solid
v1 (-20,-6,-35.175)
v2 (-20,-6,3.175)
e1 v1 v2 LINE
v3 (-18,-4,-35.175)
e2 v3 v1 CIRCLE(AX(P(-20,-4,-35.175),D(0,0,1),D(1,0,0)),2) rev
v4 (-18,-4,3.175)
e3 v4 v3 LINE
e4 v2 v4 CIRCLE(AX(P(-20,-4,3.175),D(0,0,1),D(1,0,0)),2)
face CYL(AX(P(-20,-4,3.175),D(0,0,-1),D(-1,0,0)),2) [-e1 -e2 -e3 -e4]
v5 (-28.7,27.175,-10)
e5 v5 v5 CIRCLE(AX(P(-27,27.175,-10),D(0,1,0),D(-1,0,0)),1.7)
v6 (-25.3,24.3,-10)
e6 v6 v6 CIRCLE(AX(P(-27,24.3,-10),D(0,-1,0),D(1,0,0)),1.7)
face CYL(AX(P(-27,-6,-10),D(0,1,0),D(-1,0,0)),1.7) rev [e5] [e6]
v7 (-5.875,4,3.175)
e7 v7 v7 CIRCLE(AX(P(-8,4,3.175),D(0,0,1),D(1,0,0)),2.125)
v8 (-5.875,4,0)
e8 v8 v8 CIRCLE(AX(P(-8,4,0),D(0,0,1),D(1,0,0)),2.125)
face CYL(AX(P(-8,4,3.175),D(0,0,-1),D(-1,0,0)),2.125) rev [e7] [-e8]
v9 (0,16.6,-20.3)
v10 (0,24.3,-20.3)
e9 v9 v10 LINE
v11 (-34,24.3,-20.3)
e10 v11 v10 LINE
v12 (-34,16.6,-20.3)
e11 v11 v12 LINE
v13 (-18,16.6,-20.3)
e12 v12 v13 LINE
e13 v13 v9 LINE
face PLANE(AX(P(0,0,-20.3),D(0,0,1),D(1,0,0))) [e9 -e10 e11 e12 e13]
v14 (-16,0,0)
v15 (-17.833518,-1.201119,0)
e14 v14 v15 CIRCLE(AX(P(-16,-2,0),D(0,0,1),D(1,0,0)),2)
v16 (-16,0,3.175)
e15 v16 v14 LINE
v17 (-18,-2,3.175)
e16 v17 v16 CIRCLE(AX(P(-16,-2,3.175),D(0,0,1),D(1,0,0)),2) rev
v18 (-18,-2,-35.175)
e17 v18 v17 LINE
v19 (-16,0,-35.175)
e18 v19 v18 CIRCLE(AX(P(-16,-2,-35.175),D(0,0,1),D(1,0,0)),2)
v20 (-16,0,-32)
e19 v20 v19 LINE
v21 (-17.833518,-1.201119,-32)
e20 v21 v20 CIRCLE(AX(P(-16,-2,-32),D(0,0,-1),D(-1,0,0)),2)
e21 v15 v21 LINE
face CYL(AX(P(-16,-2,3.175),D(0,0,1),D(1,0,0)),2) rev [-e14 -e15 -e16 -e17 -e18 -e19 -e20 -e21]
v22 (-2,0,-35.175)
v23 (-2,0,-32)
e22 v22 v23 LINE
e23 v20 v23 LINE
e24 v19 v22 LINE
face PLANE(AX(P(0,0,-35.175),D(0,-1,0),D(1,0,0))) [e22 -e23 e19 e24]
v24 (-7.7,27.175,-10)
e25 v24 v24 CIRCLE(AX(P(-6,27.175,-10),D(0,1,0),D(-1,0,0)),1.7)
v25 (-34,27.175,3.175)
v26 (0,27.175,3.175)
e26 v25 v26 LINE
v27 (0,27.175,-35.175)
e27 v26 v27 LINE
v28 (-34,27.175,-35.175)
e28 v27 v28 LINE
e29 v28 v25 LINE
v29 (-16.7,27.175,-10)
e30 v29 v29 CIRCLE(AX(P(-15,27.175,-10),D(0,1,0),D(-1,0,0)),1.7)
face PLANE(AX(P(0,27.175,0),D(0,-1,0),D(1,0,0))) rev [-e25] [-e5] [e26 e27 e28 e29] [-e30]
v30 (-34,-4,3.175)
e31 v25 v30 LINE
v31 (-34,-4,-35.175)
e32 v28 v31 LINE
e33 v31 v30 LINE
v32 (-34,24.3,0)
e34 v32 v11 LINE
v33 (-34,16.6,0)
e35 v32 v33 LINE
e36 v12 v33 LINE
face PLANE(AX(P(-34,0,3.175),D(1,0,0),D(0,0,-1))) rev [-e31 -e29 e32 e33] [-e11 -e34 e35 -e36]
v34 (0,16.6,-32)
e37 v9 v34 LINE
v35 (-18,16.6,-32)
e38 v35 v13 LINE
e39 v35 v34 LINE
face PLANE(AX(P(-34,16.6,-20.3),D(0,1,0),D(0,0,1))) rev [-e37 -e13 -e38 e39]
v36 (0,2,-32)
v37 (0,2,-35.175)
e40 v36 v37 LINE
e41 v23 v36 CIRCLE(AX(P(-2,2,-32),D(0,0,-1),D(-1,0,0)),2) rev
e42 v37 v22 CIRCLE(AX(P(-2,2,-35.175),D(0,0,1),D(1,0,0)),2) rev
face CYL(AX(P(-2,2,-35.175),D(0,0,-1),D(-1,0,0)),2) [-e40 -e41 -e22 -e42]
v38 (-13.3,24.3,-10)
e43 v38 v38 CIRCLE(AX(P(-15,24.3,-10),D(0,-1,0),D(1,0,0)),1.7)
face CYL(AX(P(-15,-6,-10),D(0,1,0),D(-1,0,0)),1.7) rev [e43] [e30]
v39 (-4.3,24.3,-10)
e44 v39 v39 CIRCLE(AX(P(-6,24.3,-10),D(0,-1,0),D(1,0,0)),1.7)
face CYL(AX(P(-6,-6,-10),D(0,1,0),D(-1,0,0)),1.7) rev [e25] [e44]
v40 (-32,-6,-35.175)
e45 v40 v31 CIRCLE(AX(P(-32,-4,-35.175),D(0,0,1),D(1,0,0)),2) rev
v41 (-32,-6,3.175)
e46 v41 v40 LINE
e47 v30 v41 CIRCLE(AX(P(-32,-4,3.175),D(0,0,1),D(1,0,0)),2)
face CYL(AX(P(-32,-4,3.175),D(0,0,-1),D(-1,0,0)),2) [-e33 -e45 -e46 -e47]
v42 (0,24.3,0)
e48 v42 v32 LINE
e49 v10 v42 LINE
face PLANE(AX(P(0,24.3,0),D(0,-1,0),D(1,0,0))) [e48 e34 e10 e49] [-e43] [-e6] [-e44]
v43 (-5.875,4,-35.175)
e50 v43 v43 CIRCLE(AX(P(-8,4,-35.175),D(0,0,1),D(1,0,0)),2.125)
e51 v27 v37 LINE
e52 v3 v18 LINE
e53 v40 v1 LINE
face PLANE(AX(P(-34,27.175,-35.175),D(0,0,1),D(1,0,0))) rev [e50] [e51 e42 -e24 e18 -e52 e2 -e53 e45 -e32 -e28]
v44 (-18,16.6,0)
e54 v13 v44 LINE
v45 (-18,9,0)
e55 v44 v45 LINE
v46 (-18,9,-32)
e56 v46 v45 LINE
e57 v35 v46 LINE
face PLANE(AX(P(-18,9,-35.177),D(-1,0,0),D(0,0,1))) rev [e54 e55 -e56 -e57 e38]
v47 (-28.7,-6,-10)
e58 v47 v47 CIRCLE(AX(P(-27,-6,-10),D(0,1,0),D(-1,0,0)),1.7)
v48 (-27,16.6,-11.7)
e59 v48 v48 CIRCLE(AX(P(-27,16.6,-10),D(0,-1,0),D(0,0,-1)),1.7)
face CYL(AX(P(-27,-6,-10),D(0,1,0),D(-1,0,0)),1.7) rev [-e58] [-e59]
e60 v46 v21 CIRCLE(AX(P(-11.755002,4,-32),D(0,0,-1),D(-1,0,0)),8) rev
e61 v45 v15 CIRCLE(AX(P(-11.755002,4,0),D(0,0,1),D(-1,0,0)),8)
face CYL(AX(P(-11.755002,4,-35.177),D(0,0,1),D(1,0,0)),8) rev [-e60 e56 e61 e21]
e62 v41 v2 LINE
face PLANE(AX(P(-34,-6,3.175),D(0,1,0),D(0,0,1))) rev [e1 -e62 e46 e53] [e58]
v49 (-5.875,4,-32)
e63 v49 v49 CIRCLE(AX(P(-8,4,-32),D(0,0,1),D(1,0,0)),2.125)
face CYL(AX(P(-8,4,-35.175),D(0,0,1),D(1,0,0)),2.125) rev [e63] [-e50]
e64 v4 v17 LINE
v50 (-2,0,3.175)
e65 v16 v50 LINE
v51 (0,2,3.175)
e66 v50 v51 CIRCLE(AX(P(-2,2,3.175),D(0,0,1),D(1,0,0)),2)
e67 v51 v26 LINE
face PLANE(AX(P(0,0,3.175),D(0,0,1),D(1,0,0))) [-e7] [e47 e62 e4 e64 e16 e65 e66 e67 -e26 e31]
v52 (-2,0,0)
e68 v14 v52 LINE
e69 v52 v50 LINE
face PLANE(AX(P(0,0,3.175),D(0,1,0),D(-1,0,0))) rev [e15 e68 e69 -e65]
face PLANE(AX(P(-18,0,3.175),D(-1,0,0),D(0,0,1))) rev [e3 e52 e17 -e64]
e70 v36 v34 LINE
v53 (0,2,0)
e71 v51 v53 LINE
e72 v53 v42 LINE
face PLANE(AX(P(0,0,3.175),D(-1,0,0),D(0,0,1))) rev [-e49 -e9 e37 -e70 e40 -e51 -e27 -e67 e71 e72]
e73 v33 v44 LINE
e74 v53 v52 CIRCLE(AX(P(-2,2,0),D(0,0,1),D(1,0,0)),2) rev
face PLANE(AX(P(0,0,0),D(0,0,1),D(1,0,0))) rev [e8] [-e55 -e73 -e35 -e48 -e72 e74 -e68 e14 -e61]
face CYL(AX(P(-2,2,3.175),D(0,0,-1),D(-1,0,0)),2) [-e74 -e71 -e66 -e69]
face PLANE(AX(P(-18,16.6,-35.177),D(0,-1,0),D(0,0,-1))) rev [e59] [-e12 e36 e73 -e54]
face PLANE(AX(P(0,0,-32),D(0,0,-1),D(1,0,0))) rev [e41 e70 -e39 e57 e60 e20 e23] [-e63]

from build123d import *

# Parameters (mm, degrees)
SKETCH1_R           = 2.125
BOSS_EXTRUDE1_DEPTH = 3.175
SKETCH4_W           = 34
SKETCH4_H           = 38.35
BOSS_EXTRUDE2_DEPTH = 3.175
BOSS_EXTRUDE3_REACH = 57.962
SKETCH6_W           = 34
SKETCH6_H           = 7.4
BOSS_EXTRUDE4_DEPTH = 11.7
FILLET1_START       = -36
FILLET1_DEPTH       = 40
FILLET1_START_2     = -35.175
FILLET1_2_DEPTH     = 3.175
FILLET1_3_DEPTH     = 3.175
FILLET1_START_3     = -32.3353435
FILLET1_4_DEPTH     = 32.635
SKETCH7_W           = 34
SKETCH7_H           = 20.3
CUT_EXTRUDE1_DEPTH  = 0.3
SKETCH8_R           = 1.7
CUT_EXTRUDE2_DEPTH  = 60.108893155


with BuildPart() as part:
    # Sketch1 → Boss-Extrude1 (new body)
    with BuildSketch(Plane.XY):
        Polygon((0, 0), (-18, 0), (-18, -6), (-34, -6), (-34, 0), (-34, 24), (0, 24), align=None)
        with Locations((-8, 4)):
            Circle(SKETCH1_R, mode=Mode.SUBTRACT)
    boss_extrude1 = extrude(amount=BOSS_EXTRUDE1_DEPTH)

    # Sketch4 → Boss-Extrude2 (add)
    with BuildSketch(Plane(origin=(0, 24, 0), x_dir=(1, 0, 0), z_dir=(0, 1, 0))):
        with Locations((-17, 16)):
            Rectangle(SKETCH4_W, SKETCH4_H)
    extrude(amount=BOSS_EXTRUDE2_DEPTH)

    # Mirror2: Boss-Extrude1 across plane
    add(boss_extrude1.mirror(Plane(origin=(0, 0, -16), x_dir=(1, 0, 0), z_dir=(0, 0, -1))))

    # Sketch5 → Boss-Extrude3 (add, up to next)
    with BuildSketch(Plane(origin=(0, 0, 0), x_dir=(-1, 0, 0), z_dir=(0, 0, -1)), mode=Mode.PRIVATE) as boss_extrude3_sk1:
        with BuildLine():
            Line((18, 9), (18, 16.6))
            Line((18, 16.6), (34, 16.6))
            Line((34, 16.6), (34, -6))
            Line((34, -6), (18, -6))
            Line((18, -6), (18, -1))
            ThreePointArc((18, -1), (19.755002002, 4), (18, 9))
        make_face()
    boss_extrude3_tool1 = extrude(boss_extrude3_sk1.sketch, amount=BOSS_EXTRUDE3_REACH, mode=Mode.PRIVATE) - part.part
    add(boss_extrude3_tool1.solids().sort_by_distance((-26.249904, 5.344559, 0))[0])

    # Sketch6 → Boss-Extrude4 (add)
    with BuildSketch(Plane.XY.offset(-32)):
        with Locations((-17, 20.3)):
            Rectangle(SKETCH6_W, SKETCH6_H)
    extrude(amount=BOSS_EXTRUDE4_DEPTH)

    # Fillet1: read off the stored shape, not the designer's step
    # Fillet1 outline → Fillet1 (cut)
    with BuildSketch(Plane.XY.offset(FILLET1_START)):
        with BuildLine():
            Line((-34, -6), (-32, -6))
            ThreePointArc((-32, -6), (-33.414213562, -5.414213562), (-34, -4))
            Line((-34, -4), (-34, -6))
        make_face()
        with BuildLine():
            Line((-18, -6), (-18, -4))
            ThreePointArc((-18, -4), (-18.585786438, -5.414213562), (-20, -6))
            Line((-20, -6), (-18, -6))
        make_face()
        with BuildLine():
            ThreePointArc((0, 2), (-0.585786438, 0.585786438), (-2, 0))
            Line((-2, 0), (0, 0))
            Line((0, 0), (0, 2))
        make_face()
    extrude(amount=FILLET1_DEPTH, mode=Mode.SUBTRACT)

    # Fillet1 2 outline → Fillet1 2 (add)
    with BuildSketch(Plane.XY.offset(FILLET1_START_2)):
        with BuildLine():
            Line((-16, 0), (-18, 0))
            Line((-18, 0), (-18, -2))
            ThreePointArc((-18, -2), (-17.414213562, -0.585786438), (-16, 0))
        make_face()
    extrude(amount=FILLET1_2_DEPTH)

    # Fillet1 3 outline → Fillet1 3 (add)
    with BuildSketch(Plane.XY):
        with BuildLine():
            Line((-16, 0), (-18, 0))
            Line((-18, 0), (-18, -2))
            ThreePointArc((-18, -2), (-17.414213562, -0.585786438), (-16, 0))
        make_face()
    extrude(amount=FILLET1_3_DEPTH)

    # Fillet1 4 outline → Fillet1 4 (add)
    with BuildSketch(Plane.XY.offset(FILLET1_START_3)):
        with BuildLine():
            ThreePointArc((-18, -2), (-17.957937252, -1.591978289), (-17.833518283, -1.201119092))
            ThreePointArc((-17.833518283, -1.201119092), (-17.91757965, -1.101238744), (-18, -1))
            Line((-18, -1), (-18, -2))
        make_face()
    extrude(amount=FILLET1_4_DEPTH)

    # Sketch7 → Cut-Extrude1 (cut)
    with BuildSketch(Plane.XZ.offset(-24)):
        with Locations((-17, -10.15)):
            Rectangle(SKETCH7_W, SKETCH7_H)
    extrude(amount=-CUT_EXTRUDE1_DEPTH, mode=Mode.SUBTRACT)

    # Sketch8 → Cut-Extrude2 (cut, through all)
    with BuildSketch(Plane(origin=(0, 27.175, 0), x_dir=(1, 0, 0), z_dir=(0, 1, 0))):
        with Locations(Location((-15, 10, 0), (0, 0, 180))):
            Circle(SKETCH8_R)
        with Locations(Location((-27, 10, 0), (0, 0, 180))):
            Circle(SKETCH8_R)
        with Locations(Location((-6, 10, 0), (0, 0, 180))):
            Circle(SKETCH8_R)
    extrude(amount=-CUT_EXTRUDE2_DEPTH, mode=Mode.SUBTRACT)


solid = part.part
